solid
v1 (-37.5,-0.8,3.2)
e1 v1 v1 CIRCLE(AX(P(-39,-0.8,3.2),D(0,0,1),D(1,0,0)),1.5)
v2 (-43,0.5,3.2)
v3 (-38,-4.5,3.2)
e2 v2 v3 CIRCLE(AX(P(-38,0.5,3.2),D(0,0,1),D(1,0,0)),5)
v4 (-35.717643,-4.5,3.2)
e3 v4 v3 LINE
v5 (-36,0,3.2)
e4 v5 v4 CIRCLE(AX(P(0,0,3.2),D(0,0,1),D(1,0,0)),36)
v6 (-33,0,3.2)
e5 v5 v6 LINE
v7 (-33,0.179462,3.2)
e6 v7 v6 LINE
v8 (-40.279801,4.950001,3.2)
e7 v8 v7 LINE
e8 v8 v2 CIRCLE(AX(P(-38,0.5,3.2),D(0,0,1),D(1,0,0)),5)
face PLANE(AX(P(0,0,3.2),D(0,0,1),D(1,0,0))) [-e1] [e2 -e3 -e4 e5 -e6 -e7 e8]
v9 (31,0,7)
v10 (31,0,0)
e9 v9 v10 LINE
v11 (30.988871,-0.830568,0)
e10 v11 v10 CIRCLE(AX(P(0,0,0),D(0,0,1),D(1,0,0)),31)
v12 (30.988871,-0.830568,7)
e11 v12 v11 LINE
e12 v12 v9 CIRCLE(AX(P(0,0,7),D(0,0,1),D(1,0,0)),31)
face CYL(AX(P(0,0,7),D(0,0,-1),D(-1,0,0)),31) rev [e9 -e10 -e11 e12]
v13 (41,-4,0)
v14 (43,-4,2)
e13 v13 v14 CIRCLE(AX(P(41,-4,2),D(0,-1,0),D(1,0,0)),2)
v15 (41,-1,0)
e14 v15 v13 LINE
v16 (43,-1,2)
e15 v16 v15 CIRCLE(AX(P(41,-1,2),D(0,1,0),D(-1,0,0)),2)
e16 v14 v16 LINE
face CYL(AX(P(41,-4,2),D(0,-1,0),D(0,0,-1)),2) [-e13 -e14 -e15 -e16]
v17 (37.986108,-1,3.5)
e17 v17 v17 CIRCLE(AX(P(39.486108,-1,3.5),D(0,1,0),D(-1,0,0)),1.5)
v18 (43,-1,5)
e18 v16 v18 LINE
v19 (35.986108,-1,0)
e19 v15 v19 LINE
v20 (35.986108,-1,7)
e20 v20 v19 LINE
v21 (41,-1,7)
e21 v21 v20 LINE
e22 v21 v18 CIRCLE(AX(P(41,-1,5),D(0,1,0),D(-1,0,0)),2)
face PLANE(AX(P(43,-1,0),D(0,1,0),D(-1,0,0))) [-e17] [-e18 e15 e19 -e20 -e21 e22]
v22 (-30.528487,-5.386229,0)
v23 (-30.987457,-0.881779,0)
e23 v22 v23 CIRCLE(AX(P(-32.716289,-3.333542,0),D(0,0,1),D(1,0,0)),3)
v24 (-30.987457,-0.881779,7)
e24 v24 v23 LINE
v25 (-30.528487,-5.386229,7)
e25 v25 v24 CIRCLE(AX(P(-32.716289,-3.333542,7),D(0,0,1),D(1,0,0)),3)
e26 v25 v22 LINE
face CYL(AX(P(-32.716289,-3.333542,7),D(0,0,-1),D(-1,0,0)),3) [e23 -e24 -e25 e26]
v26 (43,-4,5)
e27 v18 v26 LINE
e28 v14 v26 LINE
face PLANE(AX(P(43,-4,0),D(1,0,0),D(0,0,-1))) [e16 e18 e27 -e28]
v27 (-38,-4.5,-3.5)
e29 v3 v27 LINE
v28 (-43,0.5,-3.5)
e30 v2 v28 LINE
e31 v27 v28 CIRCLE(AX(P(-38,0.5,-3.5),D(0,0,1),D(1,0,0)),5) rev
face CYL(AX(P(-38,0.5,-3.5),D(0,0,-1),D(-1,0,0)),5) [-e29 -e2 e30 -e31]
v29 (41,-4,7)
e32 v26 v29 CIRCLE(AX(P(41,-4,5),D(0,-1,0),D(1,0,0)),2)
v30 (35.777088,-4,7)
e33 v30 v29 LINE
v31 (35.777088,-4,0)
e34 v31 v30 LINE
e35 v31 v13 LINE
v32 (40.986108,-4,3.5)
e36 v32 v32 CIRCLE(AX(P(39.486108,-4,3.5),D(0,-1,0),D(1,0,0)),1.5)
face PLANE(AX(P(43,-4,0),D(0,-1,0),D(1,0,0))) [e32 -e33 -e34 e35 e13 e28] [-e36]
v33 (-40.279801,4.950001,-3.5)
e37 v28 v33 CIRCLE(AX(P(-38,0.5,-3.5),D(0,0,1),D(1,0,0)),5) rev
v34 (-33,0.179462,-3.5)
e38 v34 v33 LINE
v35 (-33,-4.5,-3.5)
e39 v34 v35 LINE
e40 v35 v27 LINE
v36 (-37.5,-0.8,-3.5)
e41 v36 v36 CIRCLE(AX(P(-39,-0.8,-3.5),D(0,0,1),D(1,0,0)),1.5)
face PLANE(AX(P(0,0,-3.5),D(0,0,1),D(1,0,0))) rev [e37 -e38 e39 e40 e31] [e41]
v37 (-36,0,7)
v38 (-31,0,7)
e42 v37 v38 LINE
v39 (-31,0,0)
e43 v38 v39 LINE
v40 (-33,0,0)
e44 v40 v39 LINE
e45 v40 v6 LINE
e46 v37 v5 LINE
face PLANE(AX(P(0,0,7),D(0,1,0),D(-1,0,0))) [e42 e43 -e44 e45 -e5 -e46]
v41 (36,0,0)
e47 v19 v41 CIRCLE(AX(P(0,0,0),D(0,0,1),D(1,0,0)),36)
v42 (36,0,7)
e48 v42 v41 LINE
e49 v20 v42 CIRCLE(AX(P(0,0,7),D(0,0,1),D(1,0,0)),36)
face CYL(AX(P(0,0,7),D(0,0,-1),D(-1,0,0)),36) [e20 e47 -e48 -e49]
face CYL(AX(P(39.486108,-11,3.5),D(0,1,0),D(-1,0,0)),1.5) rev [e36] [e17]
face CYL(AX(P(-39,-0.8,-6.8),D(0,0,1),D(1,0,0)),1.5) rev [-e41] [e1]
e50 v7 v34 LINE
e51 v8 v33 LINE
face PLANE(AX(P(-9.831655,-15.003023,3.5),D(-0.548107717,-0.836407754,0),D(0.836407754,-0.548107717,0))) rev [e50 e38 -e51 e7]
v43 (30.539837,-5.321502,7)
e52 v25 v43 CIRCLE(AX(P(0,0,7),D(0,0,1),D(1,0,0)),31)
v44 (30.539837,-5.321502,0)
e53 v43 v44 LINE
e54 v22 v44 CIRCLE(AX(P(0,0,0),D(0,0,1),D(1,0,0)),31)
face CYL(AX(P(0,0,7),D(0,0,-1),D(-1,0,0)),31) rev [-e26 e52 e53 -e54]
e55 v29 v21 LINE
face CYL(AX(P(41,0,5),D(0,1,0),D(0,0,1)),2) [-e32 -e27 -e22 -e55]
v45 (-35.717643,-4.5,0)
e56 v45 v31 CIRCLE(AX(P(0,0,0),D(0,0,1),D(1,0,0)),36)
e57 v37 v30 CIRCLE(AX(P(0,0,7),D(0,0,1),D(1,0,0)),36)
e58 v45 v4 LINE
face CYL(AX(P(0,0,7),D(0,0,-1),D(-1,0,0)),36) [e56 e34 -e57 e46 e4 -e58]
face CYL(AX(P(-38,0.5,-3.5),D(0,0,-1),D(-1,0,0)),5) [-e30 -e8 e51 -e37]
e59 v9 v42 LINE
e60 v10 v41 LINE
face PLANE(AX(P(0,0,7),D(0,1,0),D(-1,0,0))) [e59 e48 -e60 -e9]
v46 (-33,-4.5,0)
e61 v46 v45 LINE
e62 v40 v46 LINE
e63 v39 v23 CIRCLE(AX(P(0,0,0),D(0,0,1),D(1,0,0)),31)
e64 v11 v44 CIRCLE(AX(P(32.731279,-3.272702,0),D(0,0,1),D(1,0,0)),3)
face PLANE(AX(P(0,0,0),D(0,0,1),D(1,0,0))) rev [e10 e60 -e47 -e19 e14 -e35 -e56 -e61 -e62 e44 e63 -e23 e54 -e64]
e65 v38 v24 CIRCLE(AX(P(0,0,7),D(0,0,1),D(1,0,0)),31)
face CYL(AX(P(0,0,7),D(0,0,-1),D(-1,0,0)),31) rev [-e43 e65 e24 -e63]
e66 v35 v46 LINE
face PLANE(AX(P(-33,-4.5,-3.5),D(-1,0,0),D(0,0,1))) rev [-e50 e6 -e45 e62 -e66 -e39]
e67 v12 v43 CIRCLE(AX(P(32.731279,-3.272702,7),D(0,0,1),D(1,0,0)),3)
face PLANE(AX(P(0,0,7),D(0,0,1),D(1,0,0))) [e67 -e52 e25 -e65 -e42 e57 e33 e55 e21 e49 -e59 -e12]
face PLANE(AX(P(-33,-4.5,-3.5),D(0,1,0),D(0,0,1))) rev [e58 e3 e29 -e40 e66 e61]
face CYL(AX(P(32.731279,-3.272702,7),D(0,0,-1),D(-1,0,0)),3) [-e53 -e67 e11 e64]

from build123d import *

# Parameters (mm, degrees)
BOSS_EXTRUDE2_DEPTH      = 7
BOSS_EXTRUDE7_DEPTH      = 3.5
BOSS_EXTRUDE7_DEPTH_BACK = 3.2
SKETCH7_W                = 10
SKETCH7_H                = 10
SKETCH8_R                = 1.5
CUT_EXTRUDE3_DEPTH       = 10
FILLET1_R                = 5
FILLET2_R                = 5
FILLET3_R                = 5
SKETCH9_W                = 8
SKETCH9_H                = 3
BOSS_EXTRUDE8_DEPTH      = 7
SKETCH10_R               = 1.5
CUT_EXTRUDE4_DEPTH       = 10
FILLET4_R                = 2
FILLET5_R                = 2
CUT_EXTRUDE5_DEPTH       = 7


with BuildPart() as part:
    # Sketch1 → Boss-Extrude2 (new body)
    with BuildSketch(Plane.XY):
        with BuildLine():
            Line((36, 0), (31, 0))
            ThreePointArc((31, 0), (30.997217748, -0.415321451), (30.98887149, -0.830568352))
            ThreePointArc((30.98887149, -0.830568352), (29.746163614, -2.974229152), (30.539836631, -5.321501534))
            ThreePointArc((30.539836631, -5.321501534), (0.032857513, -30.999982587), (-30.528487289, -5.386229095))
            ThreePointArc((-30.528487289, -5.386229095), (-29.731741507, -3.029439038), (-30.987456583, -0.881779181))
            ThreePointArc((-30.987456583, -0.881779181), (-30.996863987, -0.440934196), (-31, 0))
            Line((-31, 0), (-36, 0))
            ThreePointArc((-36, 0), (0, -36), (36, 0))
        make_face()
    extrude(amount=BOSS_EXTRUDE2_DEPTH)

    # Sketch7 → Boss-Extrude7 (add, two sides: drawn at the far end of the back side and taken through both)
    with BuildSketch(Plane(origin=(0, 0, 0), x_dir=(-1, 0, 0), z_dir=(0, 0, -1)).offset(-BOSS_EXTRUDE7_DEPTH_BACK)):
        with Locations((38, 0.5)):
            Rectangle(SKETCH7_W, SKETCH7_H)
    extrude(amount=BOSS_EXTRUDE7_DEPTH + BOSS_EXTRUDE7_DEPTH_BACK)

    # Sketch8 → Cut-Extrude3 (cut)
    with BuildSketch(Plane.XY.offset(3.2)):
        with Locations((-39, -0.8)):
            Circle(SKETCH8_R)
    extrude(amount=-CUT_EXTRUDE3_DEPTH, mode=Mode.SUBTRACT)

    # Fillet1
    fillet1_edges = [part.edges().sort_by_distance(p)[0] for p in [
        (-43, 5.5, -0.15),
    ]]
    fillet(fillet1_edges, radius=FILLET1_R)

    # Fillet2
    fillet2_edges = [part.edges().sort_by_distance(p)[0] for p in [
        (-43, -4.5, -0.15),
    ]]
    fillet(fillet2_edges, radius=FILLET2_R - 0.0001)  # a hair under: the kernel refuses the full size

    # Fillet3
    fillet3_edges = [part.edges().sort_by_distance(p)[0] for p in [
        (-33, 5.5, -0.15),
    ]]
    fillet(fillet3_edges, radius=FILLET3_R - 0.0001)  # a hair under: the kernel refuses the full size

    # Sketch9 → Boss-Extrude8 (add)
    with BuildSketch(Plane.XY.offset(7)):
        with Locations((39, -2.5)):
            Rectangle(SKETCH9_W, SKETCH9_H)
    extrude(amount=-BOSS_EXTRUDE8_DEPTH)

    # Sketch10 → Cut-Extrude4 (cut)
    with BuildSketch(Plane(origin=(0, -1, 0), x_dir=(1, 0, 0), z_dir=(0, 1, 0))):
        with Locations(Location((39.486108431, -3.5, 0), (0, 0, 180))):
            Circle(SKETCH10_R)
    extrude(amount=-CUT_EXTRUDE4_DEPTH, mode=Mode.SUBTRACT)

    # Fillet4
    fillet4_edges = [part.edges().sort_by_distance(p)[0] for p in [
        (43, -2.5, 7),
    ]]
    fillet(fillet4_edges, radius=FILLET4_R)

    # Fillet5
    fillet5_edges = [part.edges().sort_by_distance(p)[0] for p in [
        (43, -2.5, 0),
    ]]
    fillet(fillet5_edges, radius=FILLET5_R)

    # Sketch11 → Cut-Extrude5 (cut)
    with BuildSketch(Plane(origin=(0, 0, -3.5), x_dir=(-1, 0, 0), z_dir=(0, 0, -1))):
        with BuildLine():
            Line((33, 0.5), (33, 0.179462338))
            Line((33, 0.179462338), (40.279801287, 4.950000684))
            ThreePointArc((40.279801287, 4.950000684), (39.17260321, 5.3605557), (38, 5.5))
            ThreePointArc((38, 5.5), (34.464466094, 4.035533906), (33, 0.5))
        make_face()
    extrude(amount=-CUT_EXTRUDE5_DEPTH, mode=Mode.SUBTRACT)


with BuildPart() as cut_extrude5_kept_piece:
    # of the separate pieces the step leaves, the one the design keeps (cut_extrude5_pieces_kept)
    add(part.part.solids().sort_by_distance((43, -4, 2))[0])


solid = cut_extrude5_kept_piece.part
